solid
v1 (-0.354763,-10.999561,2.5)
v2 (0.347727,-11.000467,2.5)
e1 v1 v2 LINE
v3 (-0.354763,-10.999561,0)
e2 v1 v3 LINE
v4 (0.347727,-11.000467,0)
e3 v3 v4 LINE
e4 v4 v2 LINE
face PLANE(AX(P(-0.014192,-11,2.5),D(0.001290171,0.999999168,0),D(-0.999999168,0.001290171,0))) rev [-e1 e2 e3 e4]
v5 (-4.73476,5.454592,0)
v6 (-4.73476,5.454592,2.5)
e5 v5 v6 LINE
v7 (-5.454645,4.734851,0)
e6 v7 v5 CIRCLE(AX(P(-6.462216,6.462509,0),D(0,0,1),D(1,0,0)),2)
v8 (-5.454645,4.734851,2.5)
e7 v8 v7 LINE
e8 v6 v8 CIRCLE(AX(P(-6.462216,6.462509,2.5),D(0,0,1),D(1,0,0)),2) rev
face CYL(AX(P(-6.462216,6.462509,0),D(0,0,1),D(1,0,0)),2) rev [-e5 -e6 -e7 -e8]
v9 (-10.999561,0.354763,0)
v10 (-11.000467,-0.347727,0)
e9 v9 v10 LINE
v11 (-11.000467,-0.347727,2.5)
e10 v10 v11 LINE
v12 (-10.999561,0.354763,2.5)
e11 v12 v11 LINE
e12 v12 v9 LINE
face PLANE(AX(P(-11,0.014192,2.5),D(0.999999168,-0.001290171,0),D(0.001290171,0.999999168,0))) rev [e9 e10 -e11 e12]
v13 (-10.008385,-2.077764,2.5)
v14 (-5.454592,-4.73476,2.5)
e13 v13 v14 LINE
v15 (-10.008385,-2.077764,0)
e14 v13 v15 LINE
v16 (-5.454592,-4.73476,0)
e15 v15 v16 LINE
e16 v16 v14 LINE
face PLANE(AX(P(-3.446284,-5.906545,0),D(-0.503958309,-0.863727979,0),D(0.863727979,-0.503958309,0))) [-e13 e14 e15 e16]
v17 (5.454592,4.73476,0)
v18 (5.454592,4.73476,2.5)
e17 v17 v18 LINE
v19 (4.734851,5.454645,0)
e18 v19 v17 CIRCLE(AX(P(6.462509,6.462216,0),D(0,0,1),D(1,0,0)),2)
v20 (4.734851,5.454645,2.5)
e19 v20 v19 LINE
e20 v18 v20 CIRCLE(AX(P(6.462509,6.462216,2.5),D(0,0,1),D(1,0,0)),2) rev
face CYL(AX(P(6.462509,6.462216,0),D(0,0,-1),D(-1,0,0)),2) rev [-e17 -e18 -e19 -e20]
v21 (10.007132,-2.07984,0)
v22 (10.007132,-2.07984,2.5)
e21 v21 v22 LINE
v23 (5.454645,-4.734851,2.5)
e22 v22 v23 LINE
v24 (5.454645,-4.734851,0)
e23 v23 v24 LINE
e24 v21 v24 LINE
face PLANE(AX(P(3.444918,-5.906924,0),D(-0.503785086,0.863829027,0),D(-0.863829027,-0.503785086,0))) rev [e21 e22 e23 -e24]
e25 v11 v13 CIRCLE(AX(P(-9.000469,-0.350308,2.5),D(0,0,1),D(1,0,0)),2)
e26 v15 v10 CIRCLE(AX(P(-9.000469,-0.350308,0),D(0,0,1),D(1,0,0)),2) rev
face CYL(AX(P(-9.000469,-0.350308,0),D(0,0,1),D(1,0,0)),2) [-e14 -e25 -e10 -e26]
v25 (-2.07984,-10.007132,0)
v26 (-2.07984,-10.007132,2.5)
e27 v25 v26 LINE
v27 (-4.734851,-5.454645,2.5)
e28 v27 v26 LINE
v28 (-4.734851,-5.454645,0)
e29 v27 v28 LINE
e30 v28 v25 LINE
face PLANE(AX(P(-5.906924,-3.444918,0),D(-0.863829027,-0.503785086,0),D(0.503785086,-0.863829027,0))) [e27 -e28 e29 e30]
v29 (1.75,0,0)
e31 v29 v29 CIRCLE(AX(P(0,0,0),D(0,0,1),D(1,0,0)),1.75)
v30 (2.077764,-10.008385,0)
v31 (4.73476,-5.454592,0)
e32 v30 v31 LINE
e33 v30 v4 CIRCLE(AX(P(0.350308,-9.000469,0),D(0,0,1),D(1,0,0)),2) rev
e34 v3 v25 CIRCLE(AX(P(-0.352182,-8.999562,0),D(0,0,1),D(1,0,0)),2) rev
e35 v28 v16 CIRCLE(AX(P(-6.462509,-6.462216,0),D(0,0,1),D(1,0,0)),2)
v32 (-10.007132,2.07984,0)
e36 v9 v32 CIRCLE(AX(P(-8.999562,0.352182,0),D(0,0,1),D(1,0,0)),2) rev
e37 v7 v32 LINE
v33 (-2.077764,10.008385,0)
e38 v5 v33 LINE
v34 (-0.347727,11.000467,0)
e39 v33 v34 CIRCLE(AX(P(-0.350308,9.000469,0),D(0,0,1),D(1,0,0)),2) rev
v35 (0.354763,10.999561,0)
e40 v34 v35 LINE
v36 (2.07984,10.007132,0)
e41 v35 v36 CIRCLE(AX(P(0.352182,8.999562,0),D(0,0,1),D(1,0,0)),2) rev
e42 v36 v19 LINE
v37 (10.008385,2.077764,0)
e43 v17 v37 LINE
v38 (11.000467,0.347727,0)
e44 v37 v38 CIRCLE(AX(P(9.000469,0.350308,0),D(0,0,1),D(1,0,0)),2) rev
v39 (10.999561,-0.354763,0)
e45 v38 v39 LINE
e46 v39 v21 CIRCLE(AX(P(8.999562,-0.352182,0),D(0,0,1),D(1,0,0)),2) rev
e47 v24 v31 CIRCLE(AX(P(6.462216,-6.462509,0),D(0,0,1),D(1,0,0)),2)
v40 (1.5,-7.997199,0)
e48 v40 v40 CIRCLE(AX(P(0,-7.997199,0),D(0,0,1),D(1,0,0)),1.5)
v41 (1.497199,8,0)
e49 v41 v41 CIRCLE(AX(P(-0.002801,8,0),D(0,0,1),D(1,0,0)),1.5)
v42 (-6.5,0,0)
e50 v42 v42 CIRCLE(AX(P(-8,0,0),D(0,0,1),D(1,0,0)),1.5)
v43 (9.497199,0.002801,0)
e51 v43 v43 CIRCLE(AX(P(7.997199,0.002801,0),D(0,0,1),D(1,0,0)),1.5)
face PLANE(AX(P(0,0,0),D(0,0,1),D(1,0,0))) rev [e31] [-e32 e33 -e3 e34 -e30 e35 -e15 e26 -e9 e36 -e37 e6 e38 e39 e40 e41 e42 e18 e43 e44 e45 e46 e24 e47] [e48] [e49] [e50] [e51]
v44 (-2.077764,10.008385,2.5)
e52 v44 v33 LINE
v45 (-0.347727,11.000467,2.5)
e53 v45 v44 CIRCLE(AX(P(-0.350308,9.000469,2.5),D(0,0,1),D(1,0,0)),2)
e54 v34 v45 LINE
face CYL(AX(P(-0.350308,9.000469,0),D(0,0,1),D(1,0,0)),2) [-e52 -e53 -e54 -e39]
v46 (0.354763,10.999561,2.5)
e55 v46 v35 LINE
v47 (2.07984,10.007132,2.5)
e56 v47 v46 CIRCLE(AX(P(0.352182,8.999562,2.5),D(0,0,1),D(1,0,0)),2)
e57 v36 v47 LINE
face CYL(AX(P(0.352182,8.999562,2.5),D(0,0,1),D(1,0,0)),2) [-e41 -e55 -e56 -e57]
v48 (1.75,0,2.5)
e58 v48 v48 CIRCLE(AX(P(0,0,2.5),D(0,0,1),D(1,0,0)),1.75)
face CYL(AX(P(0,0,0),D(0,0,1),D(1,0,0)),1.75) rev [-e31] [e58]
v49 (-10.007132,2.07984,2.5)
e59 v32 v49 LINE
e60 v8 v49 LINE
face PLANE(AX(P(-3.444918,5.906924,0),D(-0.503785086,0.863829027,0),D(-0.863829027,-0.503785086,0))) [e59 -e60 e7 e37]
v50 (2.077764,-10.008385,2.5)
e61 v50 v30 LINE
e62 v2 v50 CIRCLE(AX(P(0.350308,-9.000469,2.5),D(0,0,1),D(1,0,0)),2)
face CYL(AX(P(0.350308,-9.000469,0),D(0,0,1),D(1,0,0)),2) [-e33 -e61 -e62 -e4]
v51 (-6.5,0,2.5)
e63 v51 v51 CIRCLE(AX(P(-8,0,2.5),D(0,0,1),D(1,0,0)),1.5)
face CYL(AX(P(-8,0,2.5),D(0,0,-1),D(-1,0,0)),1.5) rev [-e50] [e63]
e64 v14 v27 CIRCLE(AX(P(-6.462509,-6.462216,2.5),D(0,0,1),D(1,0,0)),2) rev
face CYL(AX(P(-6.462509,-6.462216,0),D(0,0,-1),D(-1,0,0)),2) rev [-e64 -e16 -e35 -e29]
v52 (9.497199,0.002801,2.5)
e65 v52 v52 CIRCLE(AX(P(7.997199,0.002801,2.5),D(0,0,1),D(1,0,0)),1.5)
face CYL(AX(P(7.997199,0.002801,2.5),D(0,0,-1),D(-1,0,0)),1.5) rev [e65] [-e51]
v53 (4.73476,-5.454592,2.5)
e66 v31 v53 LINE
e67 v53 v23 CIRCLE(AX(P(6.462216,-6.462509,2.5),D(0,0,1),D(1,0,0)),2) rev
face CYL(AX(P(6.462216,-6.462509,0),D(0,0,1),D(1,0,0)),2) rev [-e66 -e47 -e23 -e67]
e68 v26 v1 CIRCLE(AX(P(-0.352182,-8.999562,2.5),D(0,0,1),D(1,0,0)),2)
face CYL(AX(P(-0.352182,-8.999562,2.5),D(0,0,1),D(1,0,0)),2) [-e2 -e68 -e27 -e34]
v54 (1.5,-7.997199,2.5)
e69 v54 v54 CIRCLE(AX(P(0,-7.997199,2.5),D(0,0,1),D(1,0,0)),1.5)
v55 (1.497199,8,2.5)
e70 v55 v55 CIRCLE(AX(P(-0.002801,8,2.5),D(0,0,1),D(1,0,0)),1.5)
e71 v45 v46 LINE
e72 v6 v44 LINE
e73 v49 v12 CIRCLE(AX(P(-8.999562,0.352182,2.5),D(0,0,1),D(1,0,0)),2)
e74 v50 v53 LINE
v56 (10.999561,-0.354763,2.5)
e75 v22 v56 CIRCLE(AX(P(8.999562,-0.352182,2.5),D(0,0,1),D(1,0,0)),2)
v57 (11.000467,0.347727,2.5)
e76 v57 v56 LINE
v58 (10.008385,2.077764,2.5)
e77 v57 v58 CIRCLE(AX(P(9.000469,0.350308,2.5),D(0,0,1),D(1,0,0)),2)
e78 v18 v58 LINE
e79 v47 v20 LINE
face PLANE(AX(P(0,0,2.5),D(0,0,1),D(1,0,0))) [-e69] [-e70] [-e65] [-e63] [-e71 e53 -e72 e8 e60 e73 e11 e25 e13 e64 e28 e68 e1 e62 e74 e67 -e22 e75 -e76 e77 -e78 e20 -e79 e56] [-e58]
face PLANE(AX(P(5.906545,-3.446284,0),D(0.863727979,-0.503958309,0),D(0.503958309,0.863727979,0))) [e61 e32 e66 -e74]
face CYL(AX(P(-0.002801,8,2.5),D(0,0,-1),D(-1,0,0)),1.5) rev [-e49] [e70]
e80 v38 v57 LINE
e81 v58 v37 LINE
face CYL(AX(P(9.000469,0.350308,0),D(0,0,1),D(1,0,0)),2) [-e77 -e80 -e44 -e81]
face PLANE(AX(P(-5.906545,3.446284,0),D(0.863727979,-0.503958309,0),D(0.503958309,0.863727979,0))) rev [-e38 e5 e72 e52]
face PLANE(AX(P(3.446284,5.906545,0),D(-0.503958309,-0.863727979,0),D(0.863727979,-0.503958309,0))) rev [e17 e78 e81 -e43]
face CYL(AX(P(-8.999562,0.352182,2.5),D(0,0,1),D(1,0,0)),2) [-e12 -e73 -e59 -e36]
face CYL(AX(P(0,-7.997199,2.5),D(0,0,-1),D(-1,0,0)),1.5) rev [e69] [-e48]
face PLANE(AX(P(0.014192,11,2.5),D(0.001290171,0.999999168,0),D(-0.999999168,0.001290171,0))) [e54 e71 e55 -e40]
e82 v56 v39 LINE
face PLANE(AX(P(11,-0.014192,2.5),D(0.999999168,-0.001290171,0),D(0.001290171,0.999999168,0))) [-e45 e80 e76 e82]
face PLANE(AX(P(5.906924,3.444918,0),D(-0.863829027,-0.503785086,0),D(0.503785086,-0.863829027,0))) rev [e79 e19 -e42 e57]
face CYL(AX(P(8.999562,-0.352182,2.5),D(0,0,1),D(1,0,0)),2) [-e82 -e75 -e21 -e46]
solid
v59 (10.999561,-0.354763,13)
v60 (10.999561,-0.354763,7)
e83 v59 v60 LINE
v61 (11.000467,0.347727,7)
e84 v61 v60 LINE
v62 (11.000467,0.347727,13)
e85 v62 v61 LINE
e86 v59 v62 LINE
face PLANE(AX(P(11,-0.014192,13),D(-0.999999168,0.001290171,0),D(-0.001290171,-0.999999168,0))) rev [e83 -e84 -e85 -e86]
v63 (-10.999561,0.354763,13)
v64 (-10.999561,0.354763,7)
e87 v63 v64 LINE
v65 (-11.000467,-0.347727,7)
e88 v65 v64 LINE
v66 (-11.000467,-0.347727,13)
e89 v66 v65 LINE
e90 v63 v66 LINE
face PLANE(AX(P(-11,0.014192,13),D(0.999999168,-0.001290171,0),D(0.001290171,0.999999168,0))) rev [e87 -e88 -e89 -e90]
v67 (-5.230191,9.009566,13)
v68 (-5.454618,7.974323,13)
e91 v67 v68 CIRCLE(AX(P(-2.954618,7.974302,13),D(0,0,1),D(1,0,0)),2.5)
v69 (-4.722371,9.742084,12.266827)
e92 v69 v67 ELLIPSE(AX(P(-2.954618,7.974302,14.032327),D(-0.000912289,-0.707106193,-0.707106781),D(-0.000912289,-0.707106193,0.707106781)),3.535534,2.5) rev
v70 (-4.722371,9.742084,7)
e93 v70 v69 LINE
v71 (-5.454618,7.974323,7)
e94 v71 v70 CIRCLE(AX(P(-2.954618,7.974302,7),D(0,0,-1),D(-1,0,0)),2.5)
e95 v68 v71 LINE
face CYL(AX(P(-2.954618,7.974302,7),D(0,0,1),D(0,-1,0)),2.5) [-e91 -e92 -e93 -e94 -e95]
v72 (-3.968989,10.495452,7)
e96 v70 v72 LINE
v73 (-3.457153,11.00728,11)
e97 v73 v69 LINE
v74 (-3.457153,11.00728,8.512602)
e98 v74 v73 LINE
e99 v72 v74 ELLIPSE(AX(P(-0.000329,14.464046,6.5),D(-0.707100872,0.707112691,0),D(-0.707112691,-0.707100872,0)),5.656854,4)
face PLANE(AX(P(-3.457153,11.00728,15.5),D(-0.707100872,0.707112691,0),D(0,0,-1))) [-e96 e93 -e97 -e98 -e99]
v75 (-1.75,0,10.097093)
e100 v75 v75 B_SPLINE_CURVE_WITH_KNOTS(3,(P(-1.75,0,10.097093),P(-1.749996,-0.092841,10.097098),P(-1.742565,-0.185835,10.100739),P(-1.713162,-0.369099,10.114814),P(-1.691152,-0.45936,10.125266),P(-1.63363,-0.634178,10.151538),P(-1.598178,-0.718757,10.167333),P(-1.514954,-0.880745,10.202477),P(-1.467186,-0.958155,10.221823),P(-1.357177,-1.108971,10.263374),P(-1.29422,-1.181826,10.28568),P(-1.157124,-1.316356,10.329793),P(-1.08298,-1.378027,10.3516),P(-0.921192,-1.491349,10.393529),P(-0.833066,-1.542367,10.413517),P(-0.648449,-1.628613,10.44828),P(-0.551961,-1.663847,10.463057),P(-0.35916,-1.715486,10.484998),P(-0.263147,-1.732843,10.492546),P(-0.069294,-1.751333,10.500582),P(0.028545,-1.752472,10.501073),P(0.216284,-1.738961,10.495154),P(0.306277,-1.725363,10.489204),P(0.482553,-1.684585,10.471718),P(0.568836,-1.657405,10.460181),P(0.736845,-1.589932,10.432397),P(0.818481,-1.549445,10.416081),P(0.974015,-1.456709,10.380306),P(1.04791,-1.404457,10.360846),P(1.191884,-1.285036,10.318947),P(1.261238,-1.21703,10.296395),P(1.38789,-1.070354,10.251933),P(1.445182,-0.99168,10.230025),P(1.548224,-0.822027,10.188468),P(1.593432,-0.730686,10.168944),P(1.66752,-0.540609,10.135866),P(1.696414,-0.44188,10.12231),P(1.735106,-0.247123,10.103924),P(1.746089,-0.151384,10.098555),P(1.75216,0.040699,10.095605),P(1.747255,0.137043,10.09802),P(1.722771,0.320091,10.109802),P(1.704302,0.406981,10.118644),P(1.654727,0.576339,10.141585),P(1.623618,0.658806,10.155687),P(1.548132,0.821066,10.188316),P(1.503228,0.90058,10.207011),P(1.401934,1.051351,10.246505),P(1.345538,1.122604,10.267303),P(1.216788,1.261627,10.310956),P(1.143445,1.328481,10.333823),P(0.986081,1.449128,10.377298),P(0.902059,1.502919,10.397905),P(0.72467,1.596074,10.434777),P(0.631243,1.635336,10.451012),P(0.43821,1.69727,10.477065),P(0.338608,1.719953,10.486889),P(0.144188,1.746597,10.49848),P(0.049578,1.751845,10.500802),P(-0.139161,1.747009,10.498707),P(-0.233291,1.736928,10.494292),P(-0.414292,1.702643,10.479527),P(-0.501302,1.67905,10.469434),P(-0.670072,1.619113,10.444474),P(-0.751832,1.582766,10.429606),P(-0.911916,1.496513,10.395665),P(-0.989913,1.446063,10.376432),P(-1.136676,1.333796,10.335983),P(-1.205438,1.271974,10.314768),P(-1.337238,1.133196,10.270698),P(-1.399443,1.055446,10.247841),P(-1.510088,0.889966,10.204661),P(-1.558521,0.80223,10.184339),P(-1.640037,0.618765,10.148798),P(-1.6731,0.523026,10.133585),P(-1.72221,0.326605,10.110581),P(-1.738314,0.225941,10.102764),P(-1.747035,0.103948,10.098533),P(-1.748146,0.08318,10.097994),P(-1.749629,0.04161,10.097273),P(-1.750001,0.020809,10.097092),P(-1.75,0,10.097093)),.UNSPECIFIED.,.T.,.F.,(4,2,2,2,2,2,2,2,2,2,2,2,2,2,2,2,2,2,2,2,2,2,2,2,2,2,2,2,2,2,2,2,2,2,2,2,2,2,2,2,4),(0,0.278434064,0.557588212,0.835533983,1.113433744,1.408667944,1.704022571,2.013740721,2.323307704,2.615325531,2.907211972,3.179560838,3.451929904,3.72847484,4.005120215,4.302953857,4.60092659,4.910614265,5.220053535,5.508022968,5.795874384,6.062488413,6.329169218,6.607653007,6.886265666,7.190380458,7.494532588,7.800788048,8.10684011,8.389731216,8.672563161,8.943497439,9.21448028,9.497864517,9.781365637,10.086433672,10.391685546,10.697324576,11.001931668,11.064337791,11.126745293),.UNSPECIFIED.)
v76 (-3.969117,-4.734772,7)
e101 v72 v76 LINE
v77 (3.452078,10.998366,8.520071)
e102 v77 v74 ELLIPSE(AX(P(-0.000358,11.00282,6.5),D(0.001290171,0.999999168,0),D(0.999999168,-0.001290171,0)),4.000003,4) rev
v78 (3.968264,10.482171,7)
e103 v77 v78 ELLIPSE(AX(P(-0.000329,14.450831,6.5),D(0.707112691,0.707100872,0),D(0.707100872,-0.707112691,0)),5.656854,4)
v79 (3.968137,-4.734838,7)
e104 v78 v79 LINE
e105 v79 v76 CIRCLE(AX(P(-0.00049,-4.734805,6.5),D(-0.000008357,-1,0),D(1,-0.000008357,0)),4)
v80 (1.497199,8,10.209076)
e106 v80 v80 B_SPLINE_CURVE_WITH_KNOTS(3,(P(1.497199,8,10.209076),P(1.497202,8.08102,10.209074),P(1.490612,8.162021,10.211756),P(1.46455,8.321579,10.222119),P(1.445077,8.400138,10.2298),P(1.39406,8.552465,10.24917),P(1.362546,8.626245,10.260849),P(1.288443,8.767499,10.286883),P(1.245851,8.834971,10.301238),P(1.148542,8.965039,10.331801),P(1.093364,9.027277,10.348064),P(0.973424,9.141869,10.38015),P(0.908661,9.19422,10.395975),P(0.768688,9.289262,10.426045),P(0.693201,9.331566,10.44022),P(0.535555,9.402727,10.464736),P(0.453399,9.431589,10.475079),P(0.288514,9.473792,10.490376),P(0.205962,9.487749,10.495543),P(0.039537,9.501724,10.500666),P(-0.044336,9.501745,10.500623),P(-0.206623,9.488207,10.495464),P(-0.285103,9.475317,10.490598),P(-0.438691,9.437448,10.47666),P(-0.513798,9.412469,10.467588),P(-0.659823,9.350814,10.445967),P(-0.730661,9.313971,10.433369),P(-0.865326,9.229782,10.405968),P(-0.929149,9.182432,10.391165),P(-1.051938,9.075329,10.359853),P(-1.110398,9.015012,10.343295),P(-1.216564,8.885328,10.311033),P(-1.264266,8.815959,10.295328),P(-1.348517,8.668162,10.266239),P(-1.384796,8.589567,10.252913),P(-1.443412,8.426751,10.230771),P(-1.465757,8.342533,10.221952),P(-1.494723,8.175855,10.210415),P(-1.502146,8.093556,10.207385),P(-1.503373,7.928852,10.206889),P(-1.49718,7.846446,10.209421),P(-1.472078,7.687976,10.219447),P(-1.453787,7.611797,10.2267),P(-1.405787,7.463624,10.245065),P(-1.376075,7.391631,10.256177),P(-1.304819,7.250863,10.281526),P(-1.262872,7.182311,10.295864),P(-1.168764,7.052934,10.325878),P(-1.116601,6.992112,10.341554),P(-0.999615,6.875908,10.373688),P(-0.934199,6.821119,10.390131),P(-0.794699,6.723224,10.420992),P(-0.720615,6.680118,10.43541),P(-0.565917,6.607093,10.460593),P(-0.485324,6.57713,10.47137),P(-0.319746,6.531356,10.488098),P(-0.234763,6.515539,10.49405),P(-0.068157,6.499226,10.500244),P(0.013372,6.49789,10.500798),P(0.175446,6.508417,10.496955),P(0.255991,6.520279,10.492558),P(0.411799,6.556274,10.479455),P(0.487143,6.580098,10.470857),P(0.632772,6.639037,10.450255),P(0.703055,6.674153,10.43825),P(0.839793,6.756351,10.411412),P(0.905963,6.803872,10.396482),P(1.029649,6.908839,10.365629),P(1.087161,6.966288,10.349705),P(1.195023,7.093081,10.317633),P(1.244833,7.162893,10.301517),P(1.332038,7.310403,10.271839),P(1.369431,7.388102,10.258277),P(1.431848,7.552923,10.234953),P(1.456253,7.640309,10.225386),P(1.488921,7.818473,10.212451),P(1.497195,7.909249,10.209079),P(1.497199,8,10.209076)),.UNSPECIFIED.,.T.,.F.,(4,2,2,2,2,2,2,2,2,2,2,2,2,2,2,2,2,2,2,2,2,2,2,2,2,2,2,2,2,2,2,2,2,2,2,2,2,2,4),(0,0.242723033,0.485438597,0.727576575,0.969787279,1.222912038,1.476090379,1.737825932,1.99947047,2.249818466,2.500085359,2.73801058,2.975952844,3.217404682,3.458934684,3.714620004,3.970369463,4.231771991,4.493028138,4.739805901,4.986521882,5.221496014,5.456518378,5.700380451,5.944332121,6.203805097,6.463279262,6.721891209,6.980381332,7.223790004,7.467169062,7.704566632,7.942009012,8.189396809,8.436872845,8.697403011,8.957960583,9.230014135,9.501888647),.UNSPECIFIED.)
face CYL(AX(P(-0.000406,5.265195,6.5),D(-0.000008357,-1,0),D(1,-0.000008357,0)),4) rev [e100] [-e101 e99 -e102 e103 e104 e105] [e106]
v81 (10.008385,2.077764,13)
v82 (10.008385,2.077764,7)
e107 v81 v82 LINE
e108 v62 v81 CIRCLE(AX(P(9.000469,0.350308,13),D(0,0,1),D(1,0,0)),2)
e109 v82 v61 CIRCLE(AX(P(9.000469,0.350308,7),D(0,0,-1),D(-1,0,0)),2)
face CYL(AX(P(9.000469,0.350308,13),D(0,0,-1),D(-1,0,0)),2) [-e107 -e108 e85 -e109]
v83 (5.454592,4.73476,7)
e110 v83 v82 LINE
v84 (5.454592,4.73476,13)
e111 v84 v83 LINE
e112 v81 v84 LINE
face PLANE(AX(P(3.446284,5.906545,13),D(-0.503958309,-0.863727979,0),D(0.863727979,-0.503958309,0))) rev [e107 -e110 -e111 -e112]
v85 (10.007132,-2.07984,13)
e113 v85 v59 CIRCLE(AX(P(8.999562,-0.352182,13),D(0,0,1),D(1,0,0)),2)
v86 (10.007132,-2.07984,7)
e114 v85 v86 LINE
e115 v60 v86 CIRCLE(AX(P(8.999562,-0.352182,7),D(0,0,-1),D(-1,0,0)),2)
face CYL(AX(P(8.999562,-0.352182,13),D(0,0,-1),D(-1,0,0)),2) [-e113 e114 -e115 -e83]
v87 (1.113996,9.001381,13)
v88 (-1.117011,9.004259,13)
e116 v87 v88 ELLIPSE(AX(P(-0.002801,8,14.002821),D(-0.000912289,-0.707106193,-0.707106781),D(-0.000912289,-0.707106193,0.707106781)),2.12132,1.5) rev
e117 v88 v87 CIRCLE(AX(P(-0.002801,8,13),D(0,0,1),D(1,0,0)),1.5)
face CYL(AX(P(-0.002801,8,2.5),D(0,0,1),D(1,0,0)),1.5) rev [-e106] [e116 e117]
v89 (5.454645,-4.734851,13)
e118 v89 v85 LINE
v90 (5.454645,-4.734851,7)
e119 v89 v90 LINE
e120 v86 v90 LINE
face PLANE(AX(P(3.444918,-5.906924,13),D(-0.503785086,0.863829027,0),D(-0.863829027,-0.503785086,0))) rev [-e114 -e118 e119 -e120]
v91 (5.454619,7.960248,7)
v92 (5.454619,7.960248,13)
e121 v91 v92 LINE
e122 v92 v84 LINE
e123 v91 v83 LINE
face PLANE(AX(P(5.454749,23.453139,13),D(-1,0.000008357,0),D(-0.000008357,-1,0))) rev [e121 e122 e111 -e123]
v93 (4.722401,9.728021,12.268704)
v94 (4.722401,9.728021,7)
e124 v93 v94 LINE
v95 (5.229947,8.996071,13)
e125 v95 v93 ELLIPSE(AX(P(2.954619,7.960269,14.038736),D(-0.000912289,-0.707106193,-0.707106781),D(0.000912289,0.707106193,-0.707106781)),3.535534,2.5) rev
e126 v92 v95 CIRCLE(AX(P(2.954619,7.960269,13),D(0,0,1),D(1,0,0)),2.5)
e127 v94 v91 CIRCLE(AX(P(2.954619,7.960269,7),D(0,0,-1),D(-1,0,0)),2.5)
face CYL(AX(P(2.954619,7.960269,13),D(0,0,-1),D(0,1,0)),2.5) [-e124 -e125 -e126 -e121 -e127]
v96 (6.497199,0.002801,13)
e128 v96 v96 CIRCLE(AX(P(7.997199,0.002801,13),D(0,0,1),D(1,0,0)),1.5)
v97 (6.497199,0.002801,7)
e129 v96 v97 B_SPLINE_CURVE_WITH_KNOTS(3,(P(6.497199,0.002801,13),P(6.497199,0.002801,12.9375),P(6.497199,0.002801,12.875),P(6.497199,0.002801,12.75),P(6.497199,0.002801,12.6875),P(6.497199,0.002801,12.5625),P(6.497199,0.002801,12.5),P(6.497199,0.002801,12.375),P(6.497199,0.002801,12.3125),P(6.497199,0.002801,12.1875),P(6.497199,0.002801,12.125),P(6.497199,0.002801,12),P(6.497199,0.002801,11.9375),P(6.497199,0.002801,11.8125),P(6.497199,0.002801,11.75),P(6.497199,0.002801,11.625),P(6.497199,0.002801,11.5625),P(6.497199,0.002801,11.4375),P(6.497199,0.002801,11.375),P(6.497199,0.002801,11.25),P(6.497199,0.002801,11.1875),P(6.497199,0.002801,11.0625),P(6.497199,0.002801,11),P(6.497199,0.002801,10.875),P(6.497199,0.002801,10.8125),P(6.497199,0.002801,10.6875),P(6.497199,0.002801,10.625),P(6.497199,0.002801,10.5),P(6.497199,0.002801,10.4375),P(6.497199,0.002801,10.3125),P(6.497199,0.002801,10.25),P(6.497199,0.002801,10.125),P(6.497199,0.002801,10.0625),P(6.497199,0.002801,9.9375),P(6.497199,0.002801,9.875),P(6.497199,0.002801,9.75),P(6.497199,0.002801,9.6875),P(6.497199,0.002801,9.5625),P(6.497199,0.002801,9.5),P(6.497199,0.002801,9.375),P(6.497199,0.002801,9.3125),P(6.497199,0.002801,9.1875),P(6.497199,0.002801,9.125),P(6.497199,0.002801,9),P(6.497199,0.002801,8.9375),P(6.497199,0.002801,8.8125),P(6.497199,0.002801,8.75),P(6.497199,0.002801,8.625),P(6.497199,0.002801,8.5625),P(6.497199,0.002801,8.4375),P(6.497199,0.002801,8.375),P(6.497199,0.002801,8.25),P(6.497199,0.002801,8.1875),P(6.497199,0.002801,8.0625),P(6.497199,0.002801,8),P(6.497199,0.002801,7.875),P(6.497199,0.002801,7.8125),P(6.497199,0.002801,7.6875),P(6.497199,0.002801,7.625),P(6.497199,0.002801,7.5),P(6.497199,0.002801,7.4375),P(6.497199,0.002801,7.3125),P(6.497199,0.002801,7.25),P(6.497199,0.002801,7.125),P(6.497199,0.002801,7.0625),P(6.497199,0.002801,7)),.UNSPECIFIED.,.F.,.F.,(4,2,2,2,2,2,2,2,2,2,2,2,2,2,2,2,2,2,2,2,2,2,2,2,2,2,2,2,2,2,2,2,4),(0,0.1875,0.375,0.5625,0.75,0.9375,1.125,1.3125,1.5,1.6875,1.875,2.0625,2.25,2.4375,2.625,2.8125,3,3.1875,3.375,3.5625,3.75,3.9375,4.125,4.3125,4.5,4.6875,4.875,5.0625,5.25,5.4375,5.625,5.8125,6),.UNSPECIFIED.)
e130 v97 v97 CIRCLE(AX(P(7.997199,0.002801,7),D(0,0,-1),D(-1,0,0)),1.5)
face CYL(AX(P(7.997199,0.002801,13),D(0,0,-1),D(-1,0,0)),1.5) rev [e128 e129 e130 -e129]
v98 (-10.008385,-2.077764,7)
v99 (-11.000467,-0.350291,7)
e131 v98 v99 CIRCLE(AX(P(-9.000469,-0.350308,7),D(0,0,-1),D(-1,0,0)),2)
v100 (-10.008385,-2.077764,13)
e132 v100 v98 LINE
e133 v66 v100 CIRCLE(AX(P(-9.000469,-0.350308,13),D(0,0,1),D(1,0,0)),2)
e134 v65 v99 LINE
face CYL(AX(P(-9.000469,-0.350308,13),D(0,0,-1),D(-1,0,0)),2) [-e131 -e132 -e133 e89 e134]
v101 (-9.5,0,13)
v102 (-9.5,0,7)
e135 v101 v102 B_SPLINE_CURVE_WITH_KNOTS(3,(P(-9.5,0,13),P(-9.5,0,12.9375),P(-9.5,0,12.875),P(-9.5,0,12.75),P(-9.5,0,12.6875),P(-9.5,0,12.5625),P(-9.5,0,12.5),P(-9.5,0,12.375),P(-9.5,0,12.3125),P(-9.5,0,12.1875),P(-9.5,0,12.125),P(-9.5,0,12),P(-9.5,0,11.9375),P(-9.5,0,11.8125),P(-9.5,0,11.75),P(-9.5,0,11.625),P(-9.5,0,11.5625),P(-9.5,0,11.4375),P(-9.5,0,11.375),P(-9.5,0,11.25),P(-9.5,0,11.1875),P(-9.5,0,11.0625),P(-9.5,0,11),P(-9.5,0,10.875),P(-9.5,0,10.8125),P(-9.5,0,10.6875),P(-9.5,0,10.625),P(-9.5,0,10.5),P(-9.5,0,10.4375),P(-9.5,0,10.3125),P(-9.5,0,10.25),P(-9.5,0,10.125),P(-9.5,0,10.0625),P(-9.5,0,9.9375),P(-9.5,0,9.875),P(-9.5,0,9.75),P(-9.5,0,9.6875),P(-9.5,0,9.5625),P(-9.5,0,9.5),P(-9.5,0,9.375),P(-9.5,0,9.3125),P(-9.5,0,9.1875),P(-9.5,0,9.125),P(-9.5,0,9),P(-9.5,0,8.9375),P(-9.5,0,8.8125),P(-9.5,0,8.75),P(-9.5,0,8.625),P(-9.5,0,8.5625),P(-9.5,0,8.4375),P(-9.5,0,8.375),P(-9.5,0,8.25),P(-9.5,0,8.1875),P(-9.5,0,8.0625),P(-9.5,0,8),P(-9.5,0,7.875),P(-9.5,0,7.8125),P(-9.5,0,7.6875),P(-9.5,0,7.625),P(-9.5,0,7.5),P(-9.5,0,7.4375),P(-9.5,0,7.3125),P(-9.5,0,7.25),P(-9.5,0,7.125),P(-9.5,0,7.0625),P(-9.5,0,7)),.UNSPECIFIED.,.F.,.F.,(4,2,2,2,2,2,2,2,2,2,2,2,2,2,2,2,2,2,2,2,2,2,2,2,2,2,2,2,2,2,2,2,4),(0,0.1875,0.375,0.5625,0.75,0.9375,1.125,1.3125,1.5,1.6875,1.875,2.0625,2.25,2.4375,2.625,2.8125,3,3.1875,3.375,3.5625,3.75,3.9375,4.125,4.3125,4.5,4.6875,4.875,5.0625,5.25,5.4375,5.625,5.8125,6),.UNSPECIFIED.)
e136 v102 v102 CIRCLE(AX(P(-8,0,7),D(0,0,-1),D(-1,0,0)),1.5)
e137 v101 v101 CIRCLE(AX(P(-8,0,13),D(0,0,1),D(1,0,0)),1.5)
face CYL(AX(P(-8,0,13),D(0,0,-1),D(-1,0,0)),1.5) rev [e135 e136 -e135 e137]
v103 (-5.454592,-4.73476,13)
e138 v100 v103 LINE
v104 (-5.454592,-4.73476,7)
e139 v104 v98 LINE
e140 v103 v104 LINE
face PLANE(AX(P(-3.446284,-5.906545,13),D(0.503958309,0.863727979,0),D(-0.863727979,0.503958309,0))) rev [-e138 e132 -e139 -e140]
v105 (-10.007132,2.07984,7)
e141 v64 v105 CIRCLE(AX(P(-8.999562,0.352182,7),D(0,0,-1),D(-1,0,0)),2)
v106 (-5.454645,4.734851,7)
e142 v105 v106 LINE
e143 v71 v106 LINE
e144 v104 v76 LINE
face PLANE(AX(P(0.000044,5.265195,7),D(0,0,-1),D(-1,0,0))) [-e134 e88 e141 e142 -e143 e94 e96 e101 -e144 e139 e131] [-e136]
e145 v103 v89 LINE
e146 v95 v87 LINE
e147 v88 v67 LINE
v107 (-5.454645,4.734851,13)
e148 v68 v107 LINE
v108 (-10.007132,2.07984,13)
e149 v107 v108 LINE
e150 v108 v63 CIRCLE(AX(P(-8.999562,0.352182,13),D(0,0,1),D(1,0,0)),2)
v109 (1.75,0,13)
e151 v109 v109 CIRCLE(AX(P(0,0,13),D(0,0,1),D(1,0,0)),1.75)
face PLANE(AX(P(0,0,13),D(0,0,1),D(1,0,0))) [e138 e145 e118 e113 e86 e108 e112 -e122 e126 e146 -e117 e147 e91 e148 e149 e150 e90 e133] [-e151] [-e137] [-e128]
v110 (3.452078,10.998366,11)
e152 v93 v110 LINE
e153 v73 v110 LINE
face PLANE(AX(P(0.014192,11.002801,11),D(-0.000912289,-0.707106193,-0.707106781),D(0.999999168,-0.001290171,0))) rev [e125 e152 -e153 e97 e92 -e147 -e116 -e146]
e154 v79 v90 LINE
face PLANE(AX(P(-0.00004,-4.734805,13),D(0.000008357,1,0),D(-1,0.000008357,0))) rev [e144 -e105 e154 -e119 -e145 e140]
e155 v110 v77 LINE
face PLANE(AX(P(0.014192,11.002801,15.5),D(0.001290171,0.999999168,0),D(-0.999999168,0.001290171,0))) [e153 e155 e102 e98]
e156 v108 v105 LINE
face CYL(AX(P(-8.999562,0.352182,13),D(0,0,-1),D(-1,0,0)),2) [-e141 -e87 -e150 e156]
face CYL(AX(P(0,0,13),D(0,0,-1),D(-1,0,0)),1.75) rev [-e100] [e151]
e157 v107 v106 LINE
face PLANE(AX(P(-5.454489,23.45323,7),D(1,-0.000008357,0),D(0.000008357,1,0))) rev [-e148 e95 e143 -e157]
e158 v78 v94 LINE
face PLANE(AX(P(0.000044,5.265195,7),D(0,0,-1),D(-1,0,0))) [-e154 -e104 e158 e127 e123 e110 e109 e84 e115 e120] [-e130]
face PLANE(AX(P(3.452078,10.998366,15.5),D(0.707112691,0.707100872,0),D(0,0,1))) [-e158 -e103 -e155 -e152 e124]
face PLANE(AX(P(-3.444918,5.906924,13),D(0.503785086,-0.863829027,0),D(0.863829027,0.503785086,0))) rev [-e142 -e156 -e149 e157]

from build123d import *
from OCP.BRepAlgoAPI import BRepAlgoAPI_Cut
from OCP.TopTools import TopTools_ListOfShape
from OCP.BRepFilletAPI import BRepFilletAPI_MakeChamfer

# Parameters (mm, degrees)
BOSS_EXTRUDE1_DEPTH = 2.5
CUT_EXTRUDE1_DEPTH  = 2.5
SKETCH3_R           = 1.75
CUT_EXTRUDE2_DEPTH  = 2.5
FILLET1_R           = 2
SKETCH4_R           = 1.5000000000000004
SKETCH4_R_2         = 1.5000000000000013
SKETCH4_R_3         = 1.75
BOSS_EXTRUDE2_DEPTH = 13
CUT_EXTRUDE3_DEPTH  = 10
BOSS_EXTRUDE3_REACH = 25.186
CHAMFER1_SIZE       = 2
CHAMFER2_SIZE       = 2
CHAMFER2_SIZE2      = 2.0025685654709307
CHAMFER2_SIZE2_2    = 1.9974412928420675
FILLET3_R           = 2.5
CUT_EXTRUDE4_START  = -10.500000000000002
CUT_EXTRUDE4_DEPTH  = 10.500000000000002


with BuildPart() as part:
    # Sketch1 → Boss-Extrude1 (new body)
    with BuildSketch(Plane.XY):
        with BuildLine():
            Line((-4.999999999999999, 6.24499799839824), (-4.999999999999999, 7.5000000000000195))
            Line((-5, 7.5000000000000195), (-10.998080575377891, 1.5019194246221268))
            Line((-10.998080575377891, 1.501919424622125), (-11.00195105101394, -1.498048948986069))
            Line((-11.001951051013936, -1.4980489489860662), (-4.999999999999998, -7.500000000000005))
            Line((-4.999999999999997, -7.500000000000005), (-4.999999999999997, -6.244997998398235))
            ThreePointArc((-5.00000000000014, -6.2449979983982855), (-6.854583671255731, -4.124885779479755), (-7.859375000000005, -1.4933936551944083))
            ThreePointArc((-7.859375000000005, -1.4933936551944376), (-9.5, 1.8e-16), (-7.859375000000005, 1.4933936551944376))
            ThreePointArc((-7.859375000000005, 1.49339365519441), (-6.854583671255727, 4.124885779479761), (-5.000000000000136, 6.244997998398289))
        make_face()
        with BuildLine():
            Line((1.68e-15, 9.499997383969479), (1.22e-15, 11.000018309985846))
            Line((3.55e-15, 11.000018309985846), (-1.4980489489860744, 11.00195105101394))
            Line((-1.4980489489860798, 11.00195105101394), (-5, 7.5000000000000195))
            Line((-4.999999999999999, 7.5000000000000195), (-4.999999999999999, 6.24499799839824))
            ThreePointArc((-5.000000000000136, 6.244997998398289), (-3.346805660983304, 7.266284598583385), (-1.4961457172971084, 7.858851569575132))
            ThreePointArc((-1.4961457172971453, 7.8588515695751315), (-1.111300148118322, 9.01055955860306), (4.818e-14, 9.499997383969479))
        make_face()
        with BuildLine():
            Line((1.5019194246221144, 10.998080575377891), (3.55e-15, 11.000018309985846))
            Line((1.22e-15, 11.000018309985846), (1.68e-15, 9.499997383969479))
            ThreePointArc((4.818e-14, 9.499997383969479), (1.0588487262158253, 9.059669249106534), (1.4971985566693762, 8.000000000000005))
            ThreePointArc((1.4971985566693762, 8.000000000000005), (1.4955583505456835, 7.929872059099467), (1.4906413192094436, 7.8598974839030715))
            ThreePointArc((1.4906413192093328, 7.859897483903073), (3.3442609453700096, 7.2674561387925065), (4.9999999999998535, 6.2449979983985155))
            Line((5.000000000000001, 6.244997998398569), (5.000000000000001, 7.5))
            Line((5, 7.500000000000001), (1.5019194246221128, 10.998080575377887))
        make_face()
        with BuildLine():
            Line((11.001951051013934, 1.4980489489860673), (5, 7.500000000000001))
            Line((5.000000000000001, 7.5), (5.000000000000001, 6.244997998398569))
            ThreePointArc((4.9999999999998535, 6.2449979983985155), (6.853793728502059, 4.126198192906619), (7.858802525285774, 1.4964033107962378))
            ThreePointArc((7.858802525285775, 1.4964033107964132), (9.007744437103462, 1.111312617626003), (9.497198556669378, 0.00280144333063154))
            ThreePointArc((9.497198556669378, 0.00280144333063118), (9.008132689961226, -1.1053556656324712), (7.859848985808763, -1.4908970186704535))
            ThreePointArc((7.859848985808765, -1.4908970186706159), (6.855238727849902, -4.123797034795342), (4.99999999999985, -6.244997998398518))
            Line((5.000000000000003, -6.244997998398572), (5.000000000000003, -7.4999999999999805))
            Line((5.000000000000002, -7.49999999999998), (10.998080575377884, -1.5019194246220966))
            Line((10.998080575377887, -1.5019194246220966), (11.001951051013936, 1.498048948986062))
        make_face()
        with BuildLine():
            ThreePointArc((-1.493650300889642, -7.859326229305683), (-3.3456520241707244, -7.266815845551774), (-5.00000000000014, -6.2449979983982855))
            Line((-4.999999999999997, -6.244997998398235), (-4.999999999999997, -7.500000000000005))
            Line((-4.999999999999998, -7.500000000000005), (-1.501919424622118, -10.998080575377886))
            Line((-1.5019194246221126, -10.998080575377887), (8.88e-15, -11.000018309985842))
            Line((8.01e-15, -11.000018309985842), (7.55e-15, -9.497198556669376))
            ThreePointArc((5.28e-15, -9.497198556669375), (-1.10833399547373, -9.007938757946256), (-1.4936503008895057, -7.859326229305681))
        make_face()
        with BuildLine():
            Line((5.000000000000003, -7.4999999999999805), (5.000000000000003, -6.244997998398572))
            ThreePointArc((4.99999999999985, -6.244997998398518), (3.345652024170554, -7.266815845551852), (1.4936503008896462, -7.859326229305682))
            ThreePointArc((1.4936503008895117, -7.859326229305681), (1.4984117343597991, -7.928189322991056), (1.5000000000000033, -7.997198556669375))
            ThreePointArc((1.5000000000000033, -7.997198556669375), (1.0606601717798252, -9.057858728449196), (5.28e-15, -9.497198556669375))
            Line((7.55e-15, -9.497198556669376), (8.01e-15, -11.000018309985842))
            Line((8.88e-15, -11.000018309985842), (1.4980489489860478, -11.001951051013936))
            Line((1.498048948986046, -11.001951051013936), (5.000000000000002, -7.49999999999998))
        make_face()
        with BuildLine():
            ThreePointArc((4.948e-14, 6.500002616030531), (-1.0112889752948502, 6.88961587823281), (-1.4961457172971453, 7.8588515695751315))
            ThreePointArc((-1.4961457172971084, 7.858851569575132), (-3.346805660983304, 7.266284598583385), (-5.000000000000136, 6.244997998398289))
            Line((-4.999999999999999, 6.24499799839824), (-4.999999999999997, -6.244997998398235))
            ThreePointArc((-5.00000000000014, -6.2449979983982855), (-3.3456520241707244, -7.266815845551774), (-1.493650300889642, -7.859326229305683))
            ThreePointArc((-1.4936503008895057, -7.859326229305681), (-1.0107402012768776, -6.88886456119564), (4.65e-15, -6.497198556669375))
            Line((6.62e-15, -6.497198556669376), (2.61e-15, 6.500002616030532))
        make_face()
        with BuildLine():
            Line((-4.999999999999997, -6.244997998398235), (-4.999999999999999, 6.24499799839824))
            ThreePointArc((-5.000000000000136, 6.244997998398289), (-6.854583671255727, 4.124885779479761), (-7.859375000000005, 1.49339365519441))
            ThreePointArc((-7.859375000000005, 1.4933936551944376), (-6.890735040668823, 1.0097184013377218), (-6.5, 0))
            ThreePointArc((-6.5, -3.7e-16), (-6.890735040668824, -1.0097184013377225), (-7.859375000000005, -1.4933936551944376))
            ThreePointArc((-7.859375000000005, -1.4933936551944083), (-6.854583671255731, -4.124885779479755), (-5.00000000000014, -6.2449979983982855))
        make_face()
        with BuildLine():
            Line((5.000000000000003, -6.244997998398572), (5.000000000000001, 6.244997998398569))
            ThreePointArc((4.9999999999998535, 6.2449979983985155), (3.3442609453700096, 7.2674561387925065), (1.4906413192093328, 7.859897483903073))
            ThreePointArc((1.4906413192094436, 7.8598974839030715), (1.0081462278259794, 6.891855241323125), (4.948e-14, 6.500002616030531))
            Line((2.61e-15, 6.500002616030532), (6.62e-15, -6.497198556669376))
            ThreePointArc((4.65e-15, -6.497198556669375), (1.010740201276885, -6.888864561195641), (1.4936503008895117, -7.859326229305681))
            ThreePointArc((1.4936503008896462, -7.859326229305682), (3.345652024170554, -7.266815845551852), (4.99999999999985, -6.244997998398518))
        make_face()
        with BuildLine():
            ThreePointArc((7.858802525285774, 1.4964033107962378), (6.853793728502059, 4.126198192906619), (4.9999999999998535, 6.2449979983985155))
            Line((5.000000000000001, 6.244997998398569), (5.000000000000003, -6.244997998398572))
            ThreePointArc((4.99999999999985, -6.244997998398518), (6.855238727849902, -4.123797034795342), (7.859848985808765, -1.4908970186706159))
            ThreePointArc((7.859848985808763, -1.4908970186704535), (6.497198648703558, 0.0022759887344901), (7.858802525285775, 1.4964033107964132))
        make_face()
    extrude(amount=BOSS_EXTRUDE1_DEPTH)

    # Sketch2 → Cut-Extrude1 (cut)
    with BuildSketch(Plane.XY.offset(2.5)):
        Polygon((-4.999999999999992, 4.999999999999999), (-10.998080575377891, 1.5019194246221257), (-1.4980489489860764, 11.001951051013943), align=None)
        Polygon((-4.999999999999992, -5.000000000000001), (-1.5019194246221135, -10.998080575377887), (-11.001951051013943, -1.498048948986061), align=None)
        Polygon((1.5019194246221084, 10.998080575377891), (4.999999999999994, 4.999999999999999), (11.00195105101394, 1.4980489489860627), align=None)
        Polygon((10.99808057537789, -1.5019194246220935), (4.9999999999999805, -4.999999999999987), (1.4980489489860442, -11.00195105101394), align=None)
    extrude(amount=-CUT_EXTRUDE1_DEPTH, mode=Mode.SUBTRACT)

    # Sketch3 → Cut-Extrude2 (cut)
    with BuildSketch(Plane.XY.offset(2.5)):
        Circle(SKETCH3_R)
    extrude(amount=-CUT_EXTRUDE2_DEPTH, mode=Mode.SUBTRACT)

    # Fillet1
    fillet1_edges = [part.edges().sort_by_distance(p)[0] for p in [
        (1.498048948986047, -11.001951051013936, 1.25),
        (-1.5019194246221153, -10.998080575377887, 1.25),
        (-11.001951051013938, -1.4980489489860678, 1.25),
        (-10.998080575377891, 1.501919424622126, 1.25),
        (-1.498048948986077, 11.00195105101394, 1.25),
        (1.5019194246221135, 10.99808057537789, 1.25),
        (11.001951051013936, 1.4980489489860647, 1.25),
        (10.998080575377886, -1.5019194246220966, 1.25),
        (-4.999999999999992, -5.000000000000001, 1.25),
        (4.999999999999994, 4.999999999999999, 1.25),
        (4.9999999999999805, -4.999999999999987, 1.25),
        (-4.999999999999992, 4.999999999999999, 1.25),
    ]]
    fillet(fillet1_edges, radius=FILLET1_R)


with BuildPart() as body_2:
    # Sketch4 → Boss-Extrude2 (new body)
    with BuildSketch(Plane.XY):
        with BuildLine():
            Line((10.999560605079953, -0.35476266258465405), (11.000466938049293, 0.3477272894640323))
            ThreePointArc((11.000466938049293, 0.3477272894640323), (10.735445401790967, 1.3452224552196366), (10.008385221504662, 2.077763590329856))
            Line((10.008385221504662, 2.077763590329856), (5.454592230537567, 4.7347596263310265))
            Line((5.454592230537567, 4.7347596263310265), (-5.454645413114042, 4.734850796298495))
            Line((-5.454645413114042, 4.734850796298495), (-10.007132441559365, 2.0798403735915616))
            ThreePointArc((-10.007132441559365, 2.0798403735915616), (-10.733154020560564, 1.3495085664980957), (-10.999560605079957, 0.35476266258468264))
            Line((-10.999560605079957, 0.35476266258468264), (-11.000466938049296, -0.3477272894640293))
            ThreePointArc((-11.000466938049296, -0.3477272894640293), (-10.735445401790972, -1.3452224552196315), (-10.00838522150467, -2.0777635903298513))
            Line((-10.00838522150467, -2.0777635903298513), (-5.4545922305375685, -4.734759626331021))
            Line((-5.4545922305375685, -4.734759626331021), (5.454645413114027, -4.734850796298485))
            Line((5.454645413114027, -4.734850796298485), (10.007132441559367, -2.0798403735915305))
            ThreePointArc((10.007132441559367, -2.0798403735915305), (10.733154020560562, -1.3495085664980646), (10.999560605079953, -0.35476266258465405))
        make_face()
        with Locations(Location((-8, 0, 0), (0, 0, 180))):
            Circle(SKETCH4_R, mode=Mode.SUBTRACT)
        with Locations(Location((7.997198556669378, 0.00280144333063154, 0), (0, 0, 180))):
            Circle(SKETCH4_R_2, mode=Mode.SUBTRACT)
        with Locations(Location((0, 0, 0), (0, 0, 180))):
            Circle(SKETCH4_R_3, mode=Mode.SUBTRACT)
    extrude(amount=BOSS_EXTRUDE2_DEPTH)


with BuildPart() as cut_extrude3_tool:
    # Sketch5 → Cut-Extrude3 (new body)
    with BuildSketch(Plane(origin=(-3.956940449073e-05, -4.7348052107618415, 0), x_dir=(0.9999999999650793, -8.35713460807451e-06, 0), z_dir=(-8.35713460807451e-06, -0.9999999999650793, 0))):
        with BuildLine():
            ThreePointArc((3.968176735513784, 6.999999999999911), (-0.00045023108312392, 10.5), (-3.969077197680013, 6.99999999999989))
            Line((-3.9690771976800265, 7.000000000000001), (3.9681767355137936, 7.000000000000001))
        make_face()
        with BuildLine():
            Line((-5.4545526613235555, 6.000000000000002), (-5.4545526613235555, 0))
            Line((-5.4545526613235555, 0), (5.454684982708999, 0))
            Line((5.454684982709, 0), (5.454684982709, 6.000000000000002))
            Line((5.454684982709001, 6.000000000000002), (3.9681767355137936, 6.000000000000002))
            ThreePointArc((3.968176735513784, 6.000000000000091), (-0.0004502310831249, 2.5), (-3.9690771976800137, 6.000000000000113))
            Line((-3.9690771976800274, 6.000000000000002), (-5.4545526613235555, 6.000000000000002))
        make_face()
        Polygon((-10.00836785700516, 0), (-5.4545526613235555, 0), (-5.4545526613235555, 6.000000000000002), (-11.000464031661387, 6.000000000000002), (-11.000464031661387, 0), align=None)
        Polygon((5.454684982709, 6.000000000000002), (5.454684982709, 0), (10.007149822715876, 0), (10.999563569495164, 0), (10.999563569495164, 6.000000000000002), align=None)
        Polygon((5.454684982709, 7.000000000000001), (5.454684982709, 6.499999999999999), (10.999563569495166, 6.499999999999998), (10.999563569495164, 7.000000000000001), align=None)
        Polygon((5.454684982709, 6.499999999999999), (5.454684982709, 6.000000000000002), (10.999563569495166, 6.000000000000002), (10.999563569495164, 6.499999999999998), align=None)
        with BuildLine():
            Line((3.9995497689168857, 6.499999999999999), (5.454684982709001, 6.499999999999999))
            Line((5.454684982709, 6.499999999999999), (5.454684982709, 7.000000000000001))
            Line((5.454684982709001, 7.000000000000001), (3.9681767355137936, 7.000000000000001))
            ThreePointArc((3.968176735513784, 6.999999999999911), (3.9916988058635026, 6.750491650172627), (3.9995497689168866, 6.5))
        make_face()
        with BuildLine():
            Line((3.9681767355137936, 6.000000000000002), (5.454684982709001, 6.000000000000002))
            Line((5.454684982709, 6.000000000000002), (5.454684982709, 6.499999999999999))
            Line((5.454684982709001, 6.499999999999999), (3.9995497689168857, 6.499999999999999))
            ThreePointArc((3.9995497689168866, 6.499999999999999), (3.9916988058635026, 6.249508349827371), (3.968176735513784, 6.000000000000091))
        make_face()
        with BuildLine():
            ThreePointArc((-3.969077197680013, 6.99999999999989), (-3.99259926802973, 6.750491650172617), (-4.000450231083113, 6.500000000000001))
            Line((-4.000450231083113, 6.500000000000001), (3.9995497689168857, 6.499999999999999))
            ThreePointArc((3.9995497689168866, 6.5), (3.9916988058635026, 6.750491650172627), (3.968176735513784, 6.999999999999911))
            Line((3.9681767355137936, 7.000000000000001), (-3.9690771976800265, 7.000000000000001))
        make_face()
        with BuildLine():
            ThreePointArc((-4.000450231083113, 6.500000000000001), (-3.99259926802973, 6.249508349827385), (-3.9690771976800137, 6.000000000000113))
            Line((-3.9690771976800274, 6.000000000000002), (3.9681767355137936, 6.000000000000002))
            ThreePointArc((3.968176735513784, 6.000000000000091), (3.9916988058635026, 6.249508349827371), (3.9995497689168866, 6.499999999999999))
            Line((3.9995497689168857, 6.499999999999999), (-4.000450231083113, 6.500000000000001))
        make_face()
        with BuildLine():
            Line((-5.4545526613235555, 7.000000000000001), (-5.4545526613235555, 6.500000000000001))
            Line((-5.4545526613235555, 6.500000000000001), (-4.000450231083113, 6.500000000000001))
            ThreePointArc((-4.000450231083113, 6.500000000000001), (-3.99259926802973, 6.750491650172617), (-3.969077197680013, 6.99999999999989))
            Line((-3.9690771976800265, 7.000000000000001), (-5.4545526613235555, 7.000000000000001))
        make_face()
        with BuildLine():
            Line((-5.4545526613235555, 6.500000000000001), (-5.4545526613235555, 6.000000000000002))
            Line((-5.4545526613235555, 6.000000000000002), (-3.9690771976800274, 6.000000000000002))
            ThreePointArc((-3.9690771976800137, 6.000000000000113), (-3.99259926802973, 6.249508349827385), (-4.000450231083113, 6.500000000000001))
            Line((-4.000450231083113, 6.500000000000001), (-5.4545526613235555, 6.500000000000001))
        make_face()
        Polygon((-11.000464031661387, 6.000000000000002), (-5.4545526613235555, 6.000000000000002), (-5.4545526613235555, 6.500000000000001), (-11.000464031661387, 6.500000000000002), align=None)
        Polygon((-11.000464031661387, 6.500000000000002), (-5.4545526613235555, 6.500000000000001), (-5.4545526613235555, 7.000000000000001), (-11.000464031661387, 7.000000000000001), align=None)
        with BuildLine():
            Line((3.9681767355137936, 6.000000000000002), (-3.9690771976800274, 6.000000000000002))
            ThreePointArc((-3.9690771976800137, 6.000000000000113), (-0.0004502310831249, 2.5), (3.968176735513784, 6.000000000000091))
        make_face()
        Polygon((5.454684982708999, 0), (-5.4545526613235555, 0), (-10.00836785700516, 0), (-11.000464031661387, 0), (-11.000464031661387, -0.1540392839917084), (11.47537378277417, -0.15403928399170852), (11.475373782774168, 7.000000000000001), (11.000464031661384, 7.000000000000001), (11.000464031661384, 0), (10.999563569495164, 0), (10.007149822715876, 0), align=None)
        Polygon((10.999563569495164, 6.499999999999998), (10.999563569495164, 6.000000000000002), (10.999563569495164, 0), (11.000464031661384, 0), (11.000464031661384, 7.000000000000001), (10.999563569495166, 7.000000000000001), align=None)
    extrude(amount=-CUT_EXTRUDE3_DEPTH)


with BuildPart() as body_2_1:
    add(body_2.part)

    # Cut-Extrude3: cut by cut_extrude3_tool, with a tolerance
    cut_extrude3_stock = TopTools_ListOfShape()
    cut_extrude3_stock.Append(body_2_1.part.wrapped)
    cut_extrude3_tools = TopTools_ListOfShape()
    cut_extrude3_tools.Append(cut_extrude3_tool.part.wrapped)
    cut_extrude3_cut = BRepAlgoAPI_Cut()
    cut_extrude3_cut.SetArguments(cut_extrude3_stock)
    cut_extrude3_cut.SetTools(cut_extrude3_tools)
    cut_extrude3_cut.SetFuzzyValue(0.00001)
    cut_extrude3_cut.Build()
    add(Compound.cast(cut_extrude3_cut.Shape()).solids(), mode=Mode.REPLACE)

    # Boss-Extrude3: up to this plane
    boss_extrude3_end = Plane(origin=(0.0141918936116578, 11.002801443330645, 15.5), z_dir=(0.0012901710727390775, 0.9999991677289553, 0))
    # Sketch6 → Boss-Extrude3 (add, up to the surface)
    with BuildSketch(Plane(origin=(3.956940449337e-05, 4.734805210761849, 0), x_dir=(0.9999999999650793, -8.357134608631048e-06, 0), z_dir=(8.357134608631048e-06, 0.9999999999650793, 0)), mode=Mode.PRIVATE) as boss_extrude3_sk1:
        with BuildLine():
            Line((-3.969077197680004, -6.999999999999999), (-5.454684982709018, -7))
            Line((-5.454684982709018, -7), (-5.454684982709018, -13))
            Line((-5.454684982709018, -13), (5.454552661323551, -13))
            Line((5.454552661323551, -13), (5.454552661323551, -7))
            Line((5.454552661323551, -7), (3.968176735513771, -7.000000000000001))
            ThreePointArc((3.968176735513771, -7.000000000000001), (-0.00045023108311679, -10.500000000000002), (-3.969077197680004, -6.999999999999999))
        make_face()
    boss_extrude3_tool1 = split(extrude(boss_extrude3_sk1.sketch, amount=BOSS_EXTRUDE3_REACH, mode=Mode.PRIVATE), bisect_by=boss_extrude3_end, keep=Keep.BOTH, mode=Mode.PRIVATE)
    add(boss_extrude3_tool1.solids().sort_by_distance((0.000157, 4.734805, 10.729608))[0])

    # Chamfer1
    chamfer1_edges = [body_2_1.edges().sort_by_distance(p)[0] for p in [
        (2.579135274328e-05, 11.002819720041206, 13),
    ]]
    chamfer(chamfer1_edges, length=CHAMFER1_SIZE)

    # Chamfer2: one chamfer whose edges measure the first distance from different faces: ONE call of the kernel's chamfer builder (chamfer() names one face for all edges)
    chamfer2_edges_1 = [body_2_1.edges().sort_by_distance(p)[0] for p in [
        (5.4546445547470315, 10.995782322842832, 9),
    ]]
    chamfer2_side_1 = [body_2_1.faces().sort_by_distance(p)[0] for p in [
        (5.4546172347602715, 7.726720851550559, 9.868788931910801),
    ]]
    chamfer2_edges_2 = [body_2_1.edges().sort_by_distance(p)[0] for p in [
        (-5.454592972041547, 11.009857117239576, 9),
    ]]
    chamfer2_side_2 = [body_2_1.faces().sort_by_distance(p)[0] for p in [
        (-5.454620351012832, 7.733737661609113, 9.869097734900382),
    ]]
    chamfer2 = BRepFilletAPI_MakeChamfer(body_2_1.part.solid().wrapped)
    for e in chamfer2_edges_1:
        chamfer2.Add(CHAMFER2_SIZE, CHAMFER2_SIZE2, e.wrapped, chamfer2_side_1[0].wrapped)  # the first distance lies on this face
    for e in chamfer2_edges_2:
        chamfer2.Add(CHAMFER2_SIZE, CHAMFER2_SIZE2_2, e.wrapped, chamfer2_side_2[0].wrapped)  # the first distance lies on this face
    add(Compound.cast(chamfer2.Shape()), mode=Mode.REPLACE)

    # Fillet3
    fillet3_edges = [body_2_1.edges().sort_by_distance(p)[0] for p in [
        (5.454627840477814, 8.995782322912673, 9.99999917847617),
        (-5.454609686310764, 9.009857117309418, 9.999999178476168),
    ]]
    fillet(fillet3_edges, radius=FILLET3_R)

    # Sketch8 → Cut-Extrude4 (cut)
    with BuildSketch(Plane.XY.offset(13).offset(CUT_EXTRUDE4_START)):
        with BuildLine():
            ThreePointArc((1.4971985566693886, 8.000000000000023), (1.398126121533543, 8.536098832309692), (1.1139959459976678, 9.001380842232159))
            Line((1.1139959459976643, 9.001380842232146), (-1.1170112117076005, 9.004259225525686))
            ThreePointArc((-1.1170112117075874, 9.00425922552565), (-0.540707265679908, 6.5997652602928785), (1.4971985566693886, 8.000000000000023))
        make_face()
        with BuildLine():
            Line((-1.1170112117076005, 9.004259225525686), (1.1139959459976643, 9.001380842232146))
            ThreePointArc((1.1139959459976678, 9.001380842232159), (-0.00086618672153648, 9.499998751593457), (-1.1170112117075874, 9.00425922552565))
        make_face()
    extrude(amount=CUT_EXTRUDE4_DEPTH, mode=Mode.SUBTRACT)


solid = Compound([part.part, body_2_1.part])
